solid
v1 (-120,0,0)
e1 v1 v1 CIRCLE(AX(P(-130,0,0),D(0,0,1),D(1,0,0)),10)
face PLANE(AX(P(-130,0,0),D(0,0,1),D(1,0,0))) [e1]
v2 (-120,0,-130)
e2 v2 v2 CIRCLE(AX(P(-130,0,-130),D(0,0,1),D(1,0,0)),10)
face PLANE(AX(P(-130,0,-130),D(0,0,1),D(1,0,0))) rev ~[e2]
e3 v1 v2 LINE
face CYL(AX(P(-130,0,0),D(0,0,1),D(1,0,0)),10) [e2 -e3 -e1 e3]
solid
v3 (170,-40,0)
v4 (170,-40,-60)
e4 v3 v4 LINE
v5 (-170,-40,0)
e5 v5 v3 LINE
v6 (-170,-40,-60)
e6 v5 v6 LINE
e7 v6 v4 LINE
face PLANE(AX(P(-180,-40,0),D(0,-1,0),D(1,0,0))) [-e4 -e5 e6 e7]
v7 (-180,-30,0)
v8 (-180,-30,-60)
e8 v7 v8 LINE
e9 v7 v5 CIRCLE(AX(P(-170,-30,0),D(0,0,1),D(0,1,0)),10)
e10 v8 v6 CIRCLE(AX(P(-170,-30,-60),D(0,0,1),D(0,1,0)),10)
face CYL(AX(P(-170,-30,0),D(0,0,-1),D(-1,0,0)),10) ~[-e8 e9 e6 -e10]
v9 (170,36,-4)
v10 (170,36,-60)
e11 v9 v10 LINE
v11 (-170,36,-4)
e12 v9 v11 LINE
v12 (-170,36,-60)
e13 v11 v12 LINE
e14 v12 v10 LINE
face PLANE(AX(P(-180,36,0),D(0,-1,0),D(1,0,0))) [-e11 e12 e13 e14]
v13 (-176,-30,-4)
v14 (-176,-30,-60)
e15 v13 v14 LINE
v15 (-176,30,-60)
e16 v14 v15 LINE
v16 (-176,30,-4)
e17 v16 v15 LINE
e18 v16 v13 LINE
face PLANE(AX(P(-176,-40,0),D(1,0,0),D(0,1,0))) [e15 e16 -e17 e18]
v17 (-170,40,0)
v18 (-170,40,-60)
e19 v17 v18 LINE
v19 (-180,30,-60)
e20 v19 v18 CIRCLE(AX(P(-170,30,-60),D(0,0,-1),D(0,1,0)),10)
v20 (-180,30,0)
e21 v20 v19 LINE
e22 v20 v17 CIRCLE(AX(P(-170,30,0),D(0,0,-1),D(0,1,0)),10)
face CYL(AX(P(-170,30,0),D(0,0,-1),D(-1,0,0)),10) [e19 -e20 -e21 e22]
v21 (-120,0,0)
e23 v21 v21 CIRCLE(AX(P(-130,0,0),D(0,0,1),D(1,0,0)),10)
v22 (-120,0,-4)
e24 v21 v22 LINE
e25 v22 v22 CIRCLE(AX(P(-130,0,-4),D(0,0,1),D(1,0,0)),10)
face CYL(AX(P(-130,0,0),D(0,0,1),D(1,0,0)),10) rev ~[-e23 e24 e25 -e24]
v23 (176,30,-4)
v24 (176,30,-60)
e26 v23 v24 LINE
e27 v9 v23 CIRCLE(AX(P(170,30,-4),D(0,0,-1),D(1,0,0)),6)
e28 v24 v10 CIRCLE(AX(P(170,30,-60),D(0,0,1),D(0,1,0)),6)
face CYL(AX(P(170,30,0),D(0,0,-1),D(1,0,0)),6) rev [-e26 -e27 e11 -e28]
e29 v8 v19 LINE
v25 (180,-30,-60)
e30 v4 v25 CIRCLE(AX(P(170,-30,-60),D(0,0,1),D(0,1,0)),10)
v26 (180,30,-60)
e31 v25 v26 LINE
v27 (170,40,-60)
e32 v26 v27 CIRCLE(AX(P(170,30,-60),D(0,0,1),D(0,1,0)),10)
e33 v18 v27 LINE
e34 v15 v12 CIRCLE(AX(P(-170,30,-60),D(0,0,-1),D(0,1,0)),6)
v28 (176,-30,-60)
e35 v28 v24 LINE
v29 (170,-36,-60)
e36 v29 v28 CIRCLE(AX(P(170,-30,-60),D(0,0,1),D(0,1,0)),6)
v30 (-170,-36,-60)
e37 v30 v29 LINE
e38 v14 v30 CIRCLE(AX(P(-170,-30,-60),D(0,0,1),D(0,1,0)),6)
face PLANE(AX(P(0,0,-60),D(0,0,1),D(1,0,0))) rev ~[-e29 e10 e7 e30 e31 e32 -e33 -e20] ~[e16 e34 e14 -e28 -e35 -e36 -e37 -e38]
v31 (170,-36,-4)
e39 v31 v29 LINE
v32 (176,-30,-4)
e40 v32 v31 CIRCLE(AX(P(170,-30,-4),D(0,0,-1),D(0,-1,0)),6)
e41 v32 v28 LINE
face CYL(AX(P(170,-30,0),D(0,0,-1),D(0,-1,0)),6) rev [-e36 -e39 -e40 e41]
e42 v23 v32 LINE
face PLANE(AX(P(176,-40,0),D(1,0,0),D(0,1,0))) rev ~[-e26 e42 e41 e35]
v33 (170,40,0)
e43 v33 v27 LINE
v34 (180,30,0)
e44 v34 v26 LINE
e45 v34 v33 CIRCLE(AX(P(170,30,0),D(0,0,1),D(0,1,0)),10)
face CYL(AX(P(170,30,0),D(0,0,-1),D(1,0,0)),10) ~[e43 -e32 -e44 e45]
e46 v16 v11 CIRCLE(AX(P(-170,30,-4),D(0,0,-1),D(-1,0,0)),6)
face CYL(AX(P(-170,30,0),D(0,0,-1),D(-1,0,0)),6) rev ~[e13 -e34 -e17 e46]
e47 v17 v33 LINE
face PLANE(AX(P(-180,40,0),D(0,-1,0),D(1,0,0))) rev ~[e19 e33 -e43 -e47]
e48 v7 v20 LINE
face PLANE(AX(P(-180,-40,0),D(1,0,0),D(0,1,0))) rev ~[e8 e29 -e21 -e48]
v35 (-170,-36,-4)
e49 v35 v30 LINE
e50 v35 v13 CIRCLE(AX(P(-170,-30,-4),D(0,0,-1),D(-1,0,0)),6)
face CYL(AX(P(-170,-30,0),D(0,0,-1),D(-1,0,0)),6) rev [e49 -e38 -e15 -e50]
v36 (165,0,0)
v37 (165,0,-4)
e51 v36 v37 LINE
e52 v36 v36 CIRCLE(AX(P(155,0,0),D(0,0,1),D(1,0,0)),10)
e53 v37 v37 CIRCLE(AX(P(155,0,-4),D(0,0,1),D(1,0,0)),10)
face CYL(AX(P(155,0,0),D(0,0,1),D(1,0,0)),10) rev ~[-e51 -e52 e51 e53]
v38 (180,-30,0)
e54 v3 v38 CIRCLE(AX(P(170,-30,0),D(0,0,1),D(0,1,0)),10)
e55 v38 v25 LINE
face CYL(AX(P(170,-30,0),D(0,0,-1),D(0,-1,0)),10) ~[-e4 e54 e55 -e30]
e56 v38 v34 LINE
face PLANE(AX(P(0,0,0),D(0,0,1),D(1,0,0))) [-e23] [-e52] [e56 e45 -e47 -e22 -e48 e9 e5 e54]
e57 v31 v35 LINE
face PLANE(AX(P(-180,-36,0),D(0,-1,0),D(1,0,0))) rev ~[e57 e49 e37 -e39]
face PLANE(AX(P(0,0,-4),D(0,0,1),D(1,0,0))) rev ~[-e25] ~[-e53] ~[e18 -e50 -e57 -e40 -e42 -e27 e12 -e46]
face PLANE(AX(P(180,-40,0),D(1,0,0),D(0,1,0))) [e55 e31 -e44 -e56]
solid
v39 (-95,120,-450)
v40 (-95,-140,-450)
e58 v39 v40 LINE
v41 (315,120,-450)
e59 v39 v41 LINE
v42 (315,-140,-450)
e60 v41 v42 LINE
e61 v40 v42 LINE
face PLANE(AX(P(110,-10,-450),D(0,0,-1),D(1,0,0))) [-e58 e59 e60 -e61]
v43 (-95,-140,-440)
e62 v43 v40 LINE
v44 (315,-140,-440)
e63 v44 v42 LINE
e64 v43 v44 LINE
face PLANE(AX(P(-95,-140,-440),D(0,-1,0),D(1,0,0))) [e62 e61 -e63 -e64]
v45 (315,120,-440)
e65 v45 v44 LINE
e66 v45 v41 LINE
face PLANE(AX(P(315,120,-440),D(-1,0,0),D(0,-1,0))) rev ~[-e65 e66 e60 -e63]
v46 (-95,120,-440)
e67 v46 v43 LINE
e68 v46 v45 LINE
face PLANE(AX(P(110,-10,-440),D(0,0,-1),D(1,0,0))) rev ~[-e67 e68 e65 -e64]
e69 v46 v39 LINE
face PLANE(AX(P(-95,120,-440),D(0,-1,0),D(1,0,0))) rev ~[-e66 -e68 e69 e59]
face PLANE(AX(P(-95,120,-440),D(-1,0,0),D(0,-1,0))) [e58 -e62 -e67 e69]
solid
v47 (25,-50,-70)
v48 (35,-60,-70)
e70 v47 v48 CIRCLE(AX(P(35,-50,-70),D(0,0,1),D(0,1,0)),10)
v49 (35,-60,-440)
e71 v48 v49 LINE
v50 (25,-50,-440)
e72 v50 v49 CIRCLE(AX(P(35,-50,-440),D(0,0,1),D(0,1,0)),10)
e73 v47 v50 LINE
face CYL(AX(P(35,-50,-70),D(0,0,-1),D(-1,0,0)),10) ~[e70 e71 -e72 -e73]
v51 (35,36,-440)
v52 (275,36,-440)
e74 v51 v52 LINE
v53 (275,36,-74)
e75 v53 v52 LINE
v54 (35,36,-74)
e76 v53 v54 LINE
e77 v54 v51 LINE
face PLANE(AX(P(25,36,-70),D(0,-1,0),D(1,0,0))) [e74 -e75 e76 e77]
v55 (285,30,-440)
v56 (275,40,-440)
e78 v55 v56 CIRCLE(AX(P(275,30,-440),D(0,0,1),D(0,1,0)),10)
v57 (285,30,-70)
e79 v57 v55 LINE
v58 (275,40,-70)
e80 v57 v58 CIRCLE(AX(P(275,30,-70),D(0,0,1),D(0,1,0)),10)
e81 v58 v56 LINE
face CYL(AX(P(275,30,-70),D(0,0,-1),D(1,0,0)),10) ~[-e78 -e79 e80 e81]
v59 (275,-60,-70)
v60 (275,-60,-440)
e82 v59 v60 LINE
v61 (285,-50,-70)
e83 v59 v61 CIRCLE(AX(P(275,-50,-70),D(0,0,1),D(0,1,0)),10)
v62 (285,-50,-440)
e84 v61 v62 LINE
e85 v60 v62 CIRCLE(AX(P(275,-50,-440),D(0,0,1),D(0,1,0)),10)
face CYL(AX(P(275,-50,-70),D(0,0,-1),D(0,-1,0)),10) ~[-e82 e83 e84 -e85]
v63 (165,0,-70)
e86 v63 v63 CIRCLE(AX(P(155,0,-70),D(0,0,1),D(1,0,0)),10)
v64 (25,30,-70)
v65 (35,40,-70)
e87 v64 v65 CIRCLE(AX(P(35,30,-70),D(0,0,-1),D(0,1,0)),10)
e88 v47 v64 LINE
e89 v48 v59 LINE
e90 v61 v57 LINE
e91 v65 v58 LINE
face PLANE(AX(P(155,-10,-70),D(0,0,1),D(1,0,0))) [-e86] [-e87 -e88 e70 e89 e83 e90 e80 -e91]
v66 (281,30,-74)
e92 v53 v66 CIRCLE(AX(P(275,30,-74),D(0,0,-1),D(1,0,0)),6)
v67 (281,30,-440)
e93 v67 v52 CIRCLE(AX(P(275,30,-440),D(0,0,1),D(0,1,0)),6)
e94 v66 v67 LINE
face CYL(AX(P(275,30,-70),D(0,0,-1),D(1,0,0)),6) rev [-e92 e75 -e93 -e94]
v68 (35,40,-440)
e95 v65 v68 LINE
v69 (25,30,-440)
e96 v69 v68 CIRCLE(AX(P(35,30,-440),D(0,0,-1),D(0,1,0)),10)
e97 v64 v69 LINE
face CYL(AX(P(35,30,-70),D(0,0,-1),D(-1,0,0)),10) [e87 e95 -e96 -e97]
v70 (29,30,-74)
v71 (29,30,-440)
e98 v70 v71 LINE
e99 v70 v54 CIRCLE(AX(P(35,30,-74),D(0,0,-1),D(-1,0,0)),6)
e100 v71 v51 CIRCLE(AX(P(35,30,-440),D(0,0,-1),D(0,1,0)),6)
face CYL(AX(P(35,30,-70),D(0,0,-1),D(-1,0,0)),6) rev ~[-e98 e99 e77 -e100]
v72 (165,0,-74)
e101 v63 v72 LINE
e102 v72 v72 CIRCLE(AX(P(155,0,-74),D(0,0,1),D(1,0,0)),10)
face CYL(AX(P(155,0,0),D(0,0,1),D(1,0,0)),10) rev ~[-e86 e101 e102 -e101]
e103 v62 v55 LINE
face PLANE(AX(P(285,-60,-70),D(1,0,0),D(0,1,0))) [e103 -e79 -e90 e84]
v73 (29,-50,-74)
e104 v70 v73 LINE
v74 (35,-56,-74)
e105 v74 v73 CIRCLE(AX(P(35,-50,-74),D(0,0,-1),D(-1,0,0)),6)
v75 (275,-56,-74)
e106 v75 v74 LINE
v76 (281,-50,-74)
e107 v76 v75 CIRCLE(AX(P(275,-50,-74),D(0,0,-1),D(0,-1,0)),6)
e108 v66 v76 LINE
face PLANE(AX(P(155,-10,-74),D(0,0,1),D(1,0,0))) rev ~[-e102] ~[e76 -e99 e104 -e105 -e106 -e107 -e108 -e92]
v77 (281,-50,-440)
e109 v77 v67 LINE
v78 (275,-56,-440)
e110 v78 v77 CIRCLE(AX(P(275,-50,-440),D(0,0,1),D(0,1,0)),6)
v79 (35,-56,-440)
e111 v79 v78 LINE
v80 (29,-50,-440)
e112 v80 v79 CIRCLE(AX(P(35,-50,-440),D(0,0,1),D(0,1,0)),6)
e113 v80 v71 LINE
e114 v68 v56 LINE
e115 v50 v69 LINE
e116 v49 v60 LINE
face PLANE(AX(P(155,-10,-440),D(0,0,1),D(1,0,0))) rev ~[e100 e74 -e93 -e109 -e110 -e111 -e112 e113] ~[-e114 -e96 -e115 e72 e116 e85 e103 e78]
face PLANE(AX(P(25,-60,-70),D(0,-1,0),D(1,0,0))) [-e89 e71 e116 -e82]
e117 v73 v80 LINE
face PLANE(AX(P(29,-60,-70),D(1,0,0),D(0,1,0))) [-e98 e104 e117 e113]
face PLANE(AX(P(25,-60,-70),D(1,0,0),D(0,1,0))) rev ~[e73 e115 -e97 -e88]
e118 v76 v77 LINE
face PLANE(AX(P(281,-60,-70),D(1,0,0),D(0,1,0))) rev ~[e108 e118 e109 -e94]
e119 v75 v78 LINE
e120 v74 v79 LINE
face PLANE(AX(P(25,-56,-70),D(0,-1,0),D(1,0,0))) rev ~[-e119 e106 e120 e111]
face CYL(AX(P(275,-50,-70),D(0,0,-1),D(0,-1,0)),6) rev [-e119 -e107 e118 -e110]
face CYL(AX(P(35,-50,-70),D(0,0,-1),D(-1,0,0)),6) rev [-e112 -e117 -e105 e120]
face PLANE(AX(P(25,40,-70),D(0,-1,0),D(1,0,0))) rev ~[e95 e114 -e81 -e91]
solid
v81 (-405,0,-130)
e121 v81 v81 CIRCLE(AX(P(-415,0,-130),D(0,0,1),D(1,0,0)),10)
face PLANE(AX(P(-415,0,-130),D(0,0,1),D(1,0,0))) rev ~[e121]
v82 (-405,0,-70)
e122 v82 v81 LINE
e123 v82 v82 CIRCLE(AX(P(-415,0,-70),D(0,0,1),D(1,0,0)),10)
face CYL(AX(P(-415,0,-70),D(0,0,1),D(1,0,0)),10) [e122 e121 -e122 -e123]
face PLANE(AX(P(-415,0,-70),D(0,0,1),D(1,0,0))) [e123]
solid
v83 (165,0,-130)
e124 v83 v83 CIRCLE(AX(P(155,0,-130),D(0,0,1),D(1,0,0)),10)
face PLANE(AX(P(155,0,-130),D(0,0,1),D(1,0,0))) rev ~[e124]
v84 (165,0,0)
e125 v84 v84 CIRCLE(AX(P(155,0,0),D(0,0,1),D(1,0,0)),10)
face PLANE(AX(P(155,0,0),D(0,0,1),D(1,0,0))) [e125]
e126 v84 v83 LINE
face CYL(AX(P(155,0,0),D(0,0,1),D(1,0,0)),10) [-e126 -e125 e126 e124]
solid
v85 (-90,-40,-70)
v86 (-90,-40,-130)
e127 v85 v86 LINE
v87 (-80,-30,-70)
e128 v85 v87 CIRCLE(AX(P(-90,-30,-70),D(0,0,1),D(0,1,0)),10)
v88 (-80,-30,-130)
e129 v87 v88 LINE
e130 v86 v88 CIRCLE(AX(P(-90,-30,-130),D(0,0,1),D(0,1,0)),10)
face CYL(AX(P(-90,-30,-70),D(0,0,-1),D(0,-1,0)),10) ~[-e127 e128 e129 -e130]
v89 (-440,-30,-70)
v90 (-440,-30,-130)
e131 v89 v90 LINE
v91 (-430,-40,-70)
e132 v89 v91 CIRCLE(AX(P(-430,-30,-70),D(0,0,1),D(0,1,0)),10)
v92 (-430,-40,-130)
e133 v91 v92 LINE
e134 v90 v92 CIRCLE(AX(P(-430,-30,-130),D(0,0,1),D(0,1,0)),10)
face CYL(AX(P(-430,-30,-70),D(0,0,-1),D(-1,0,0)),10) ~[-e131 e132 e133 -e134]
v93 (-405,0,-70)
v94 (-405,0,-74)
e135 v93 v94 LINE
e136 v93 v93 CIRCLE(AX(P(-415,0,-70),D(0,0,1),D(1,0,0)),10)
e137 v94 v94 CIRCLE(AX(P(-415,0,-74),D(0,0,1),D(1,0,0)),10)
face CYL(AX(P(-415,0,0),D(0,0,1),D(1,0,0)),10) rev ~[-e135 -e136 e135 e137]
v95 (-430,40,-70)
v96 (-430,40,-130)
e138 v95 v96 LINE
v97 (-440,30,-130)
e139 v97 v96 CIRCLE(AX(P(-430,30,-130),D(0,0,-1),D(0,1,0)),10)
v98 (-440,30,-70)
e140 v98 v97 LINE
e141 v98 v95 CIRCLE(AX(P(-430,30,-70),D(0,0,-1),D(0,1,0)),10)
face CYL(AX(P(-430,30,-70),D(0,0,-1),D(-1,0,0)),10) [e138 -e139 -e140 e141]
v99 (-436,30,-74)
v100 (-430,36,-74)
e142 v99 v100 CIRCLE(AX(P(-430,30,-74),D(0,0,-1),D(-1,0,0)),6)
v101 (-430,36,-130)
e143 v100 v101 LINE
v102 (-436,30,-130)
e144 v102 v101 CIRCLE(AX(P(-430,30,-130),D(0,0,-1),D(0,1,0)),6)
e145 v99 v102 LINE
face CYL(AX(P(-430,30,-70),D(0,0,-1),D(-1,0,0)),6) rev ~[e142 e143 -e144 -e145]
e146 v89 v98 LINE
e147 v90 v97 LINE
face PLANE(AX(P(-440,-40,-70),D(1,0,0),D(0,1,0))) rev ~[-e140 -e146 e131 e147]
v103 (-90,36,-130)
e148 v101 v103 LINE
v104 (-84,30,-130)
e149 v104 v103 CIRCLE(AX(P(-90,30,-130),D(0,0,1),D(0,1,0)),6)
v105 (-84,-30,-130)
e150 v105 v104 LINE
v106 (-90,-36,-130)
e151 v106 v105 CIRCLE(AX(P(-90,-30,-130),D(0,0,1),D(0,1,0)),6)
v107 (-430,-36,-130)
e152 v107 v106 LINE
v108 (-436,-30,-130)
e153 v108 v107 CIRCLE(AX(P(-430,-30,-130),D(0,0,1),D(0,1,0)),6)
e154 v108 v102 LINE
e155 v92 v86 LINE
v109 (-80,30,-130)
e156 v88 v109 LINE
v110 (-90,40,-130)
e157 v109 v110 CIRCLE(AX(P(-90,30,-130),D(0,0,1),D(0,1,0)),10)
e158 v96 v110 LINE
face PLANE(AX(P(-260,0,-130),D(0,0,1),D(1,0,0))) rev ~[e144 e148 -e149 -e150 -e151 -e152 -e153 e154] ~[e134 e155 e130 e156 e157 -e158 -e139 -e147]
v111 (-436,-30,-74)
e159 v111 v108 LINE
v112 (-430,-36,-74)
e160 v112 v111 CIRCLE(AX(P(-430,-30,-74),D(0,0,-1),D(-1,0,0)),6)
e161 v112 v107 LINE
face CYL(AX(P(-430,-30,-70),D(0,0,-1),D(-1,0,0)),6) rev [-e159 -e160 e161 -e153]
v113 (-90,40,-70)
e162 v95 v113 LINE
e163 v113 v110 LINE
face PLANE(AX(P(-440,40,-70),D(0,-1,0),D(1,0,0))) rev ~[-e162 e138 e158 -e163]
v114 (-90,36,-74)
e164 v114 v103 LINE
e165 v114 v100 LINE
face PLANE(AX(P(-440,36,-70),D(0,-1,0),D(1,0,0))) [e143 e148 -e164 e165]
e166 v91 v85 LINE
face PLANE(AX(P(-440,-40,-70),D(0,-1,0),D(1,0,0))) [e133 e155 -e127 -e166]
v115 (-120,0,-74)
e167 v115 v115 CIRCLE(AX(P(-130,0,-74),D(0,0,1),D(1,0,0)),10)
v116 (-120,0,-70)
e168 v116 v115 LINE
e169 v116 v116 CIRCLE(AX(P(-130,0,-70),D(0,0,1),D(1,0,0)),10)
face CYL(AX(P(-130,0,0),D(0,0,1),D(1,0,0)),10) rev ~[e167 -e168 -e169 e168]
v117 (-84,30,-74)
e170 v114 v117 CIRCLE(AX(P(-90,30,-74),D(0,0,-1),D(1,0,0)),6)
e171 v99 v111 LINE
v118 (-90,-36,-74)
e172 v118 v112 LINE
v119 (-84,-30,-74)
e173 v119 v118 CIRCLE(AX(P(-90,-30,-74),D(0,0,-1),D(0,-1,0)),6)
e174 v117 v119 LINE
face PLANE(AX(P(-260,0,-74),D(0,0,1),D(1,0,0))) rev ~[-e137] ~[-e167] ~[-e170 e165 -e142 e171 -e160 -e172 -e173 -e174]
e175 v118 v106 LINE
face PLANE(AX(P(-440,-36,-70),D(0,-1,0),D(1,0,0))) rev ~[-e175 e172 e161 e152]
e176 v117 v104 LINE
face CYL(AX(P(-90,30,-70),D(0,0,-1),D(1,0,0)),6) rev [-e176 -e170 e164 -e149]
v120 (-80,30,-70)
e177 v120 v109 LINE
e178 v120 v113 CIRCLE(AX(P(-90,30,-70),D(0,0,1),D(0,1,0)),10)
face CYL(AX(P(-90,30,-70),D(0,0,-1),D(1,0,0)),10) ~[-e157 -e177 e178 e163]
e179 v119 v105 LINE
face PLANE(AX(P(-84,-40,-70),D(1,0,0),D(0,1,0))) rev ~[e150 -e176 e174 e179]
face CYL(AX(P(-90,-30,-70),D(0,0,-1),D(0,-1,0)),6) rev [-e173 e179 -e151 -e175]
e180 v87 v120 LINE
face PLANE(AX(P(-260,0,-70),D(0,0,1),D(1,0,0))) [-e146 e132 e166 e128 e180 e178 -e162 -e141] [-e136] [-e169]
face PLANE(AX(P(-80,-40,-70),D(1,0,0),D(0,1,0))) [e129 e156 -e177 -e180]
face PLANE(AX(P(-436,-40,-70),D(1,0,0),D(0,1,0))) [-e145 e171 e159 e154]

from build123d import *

# Parameters (mm, degrees)
F0_W      = 360
F0_H      = 80
F1_DEPTH  = 60
F3_W      = 260
F3_H      = 100
F4_DEPTH  = 370
F5_W      = 410
F5_H      = 260
F5_W_2    = 260
F5_H_2    = 100
F6_DEPTH  = 10
F7_W      = 360
F7_H      = 80
F8_DEPTH  = 60
F10_R     = 10
F10_2_R   = 10
F10_3_R   = 10
F11_T     = -4
F11_2_T   = -4
F11_3_T   = -4
F9_R      = 10
F12_DEPTH = 130
F13_DEPTH = 130
F14_R     = 10
F15_DEPTH = 60
F20_R     = 17.5
F20_R_2   = 10
F21_DEPTH = 10


# Not quite as in the source:
# - a feature names something its author has since deleted; it is built from what else it names


with BuildPart() as f1:
    # F0 (on Top) → F1 (new body)
    with BuildSketch(Plane.XY):
        Rectangle(F0_W, F0_H)
    extrude(amount=-F1_DEPTH)

    # F10
    f10_edges = [f1.edges().sort_by_distance(p)[0] for p in [
        (-180, -40, -30),
        (180, -40, -30),
        (180, 40, -30),
        (-180, 40, -30),
    ]]
    fillet(f10_edges, radius=F10_R)

    # F11
    f11_openings = [f1.faces().sort_by_distance(p)[0] for p in [
        (0, 0, -60),
    ]]
    offset(amount=F11_T, openings=f11_openings)


with BuildPart() as f4:
    # F3 (on offset) → F4 (new body)
    with BuildSketch(Plane.XY.offset(-70)):
        with Locations((155, -10)):
            Rectangle(F3_W, F3_H)
    extrude(amount=-F4_DEPTH)

    # F10#2
    f10_2_edges = [f4.edges().sort_by_distance(p)[0] for p in [
        (25, 40, -255),
        (25, -60, -255),
        (285, 40, -255),
        (285, -60, -255),
    ]]
    fillet(f10_2_edges, radius=F10_2_R)

    # F11#3
    f11_3_openings = [f4.faces().sort_by_distance(p)[0] for p in [
        (155, -10, -440),
    ]]
    offset(amount=F11_3_T, openings=f11_3_openings)


with BuildPart() as f6:
    # F5 (on face) → F6 (new body)
    with BuildSketch(Plane(origin=(0, 0, -440), x_dir=(1, 0, 0), z_dir=(0, 0, -1))):
        with Locations((110, 10)):
            Rectangle(F5_W, F5_H)
        with Locations((155, 10)):
            Rectangle(F5_W_2, F5_H_2, mode=Mode.SUBTRACT)
        with Locations((155, 10)):
            Rectangle(F5_W_2, F5_H_2)
    extrude(amount=F6_DEPTH)


with BuildPart() as f8:
    # F7 (on face) → F8 (new body)
    with BuildSketch(Plane.XY.offset(-70)):
        with Locations((-260, 0)):
            Rectangle(F7_W, F7_H)
    extrude(amount=-F8_DEPTH)

    # F10#3
    f10_3_edges = [f8.edges().sort_by_distance(p)[0] for p in [
        (-440, -40, -100),
        (-440, 40, -100),
        (-80, 40, -100),
        (-80, -40, -100),
    ]]
    fillet(f10_3_edges, radius=F10_3_R)

    # F11#2
    f11_2_openings = [f8.faces().sort_by_distance(p)[0] for p in [
        (-260, 0, -130),
    ]]
    offset(amount=F11_2_T, openings=f11_2_openings)


with BuildPart() as f12_tool:
    # F9 (on face) → F12 (new body)
    with BuildSketch(Plane.XY):
        with Locations((-415, 0)):
            Circle(F9_R)
        with Locations((-130, 0)):
            Circle(F9_R)
        with Locations((155, 0)):
            Circle(F9_R)
    extrude(amount=-F12_DEPTH)


with BuildPart() as f1_1:
    add(f1.part)

    # F12: cut by f12_tool
    add(f12_tool.part, mode=Mode.SUBTRACT)


with BuildPart() as f4_1:
    add(f4.part)

    # F12: cut by f12_tool
    add(f12_tool.part, mode=Mode.SUBTRACT)


with BuildPart() as f8_1:
    add(f8.part)

    # F12: cut by f12_tool
    add(f12_tool.part, mode=Mode.SUBTRACT)


with BuildPart() as f13:
    # F9 (on face) → F13 (new body)
    with BuildSketch(Plane.XY):
        with Locations((-130, 0)):
            Circle(F9_R)
    extrude(amount=-F13_DEPTH)


with BuildPart() as f13b:
    # F9 (on face) → F13, piece 2 (new body)
    with BuildSketch(Plane.XY):
        with Locations((155, 0)):
            Circle(F9_R)
    extrude(amount=-F13_DEPTH)


with BuildPart() as f15:
    # F14 (on face) → F15 (new body)
    with BuildSketch(Plane.XY.offset(-70)):
        with Locations((-415, 0)):
            Circle(F14_R)
    extrude(amount=-F15_DEPTH)


with BuildPart() as f21:
    # F20 (on offset) → F21 (new body)
    with BuildSketch(Plane(origin=(0, 0, -107), x_dir=(1, 0, 0), z_dir=(0, 0, -1))):
        with Locations((-130, 0)):
            Circle(F20_R)
        with Locations((-130, 0)):
            Circle(F20_R_2, mode=Mode.SUBTRACT)
    extrude(amount=-F21_DEPTH)


solid = Compound([f6.part, f1_1.part, f4_1.part, f8_1.part, f13.part, f13b.part, f15.part])
